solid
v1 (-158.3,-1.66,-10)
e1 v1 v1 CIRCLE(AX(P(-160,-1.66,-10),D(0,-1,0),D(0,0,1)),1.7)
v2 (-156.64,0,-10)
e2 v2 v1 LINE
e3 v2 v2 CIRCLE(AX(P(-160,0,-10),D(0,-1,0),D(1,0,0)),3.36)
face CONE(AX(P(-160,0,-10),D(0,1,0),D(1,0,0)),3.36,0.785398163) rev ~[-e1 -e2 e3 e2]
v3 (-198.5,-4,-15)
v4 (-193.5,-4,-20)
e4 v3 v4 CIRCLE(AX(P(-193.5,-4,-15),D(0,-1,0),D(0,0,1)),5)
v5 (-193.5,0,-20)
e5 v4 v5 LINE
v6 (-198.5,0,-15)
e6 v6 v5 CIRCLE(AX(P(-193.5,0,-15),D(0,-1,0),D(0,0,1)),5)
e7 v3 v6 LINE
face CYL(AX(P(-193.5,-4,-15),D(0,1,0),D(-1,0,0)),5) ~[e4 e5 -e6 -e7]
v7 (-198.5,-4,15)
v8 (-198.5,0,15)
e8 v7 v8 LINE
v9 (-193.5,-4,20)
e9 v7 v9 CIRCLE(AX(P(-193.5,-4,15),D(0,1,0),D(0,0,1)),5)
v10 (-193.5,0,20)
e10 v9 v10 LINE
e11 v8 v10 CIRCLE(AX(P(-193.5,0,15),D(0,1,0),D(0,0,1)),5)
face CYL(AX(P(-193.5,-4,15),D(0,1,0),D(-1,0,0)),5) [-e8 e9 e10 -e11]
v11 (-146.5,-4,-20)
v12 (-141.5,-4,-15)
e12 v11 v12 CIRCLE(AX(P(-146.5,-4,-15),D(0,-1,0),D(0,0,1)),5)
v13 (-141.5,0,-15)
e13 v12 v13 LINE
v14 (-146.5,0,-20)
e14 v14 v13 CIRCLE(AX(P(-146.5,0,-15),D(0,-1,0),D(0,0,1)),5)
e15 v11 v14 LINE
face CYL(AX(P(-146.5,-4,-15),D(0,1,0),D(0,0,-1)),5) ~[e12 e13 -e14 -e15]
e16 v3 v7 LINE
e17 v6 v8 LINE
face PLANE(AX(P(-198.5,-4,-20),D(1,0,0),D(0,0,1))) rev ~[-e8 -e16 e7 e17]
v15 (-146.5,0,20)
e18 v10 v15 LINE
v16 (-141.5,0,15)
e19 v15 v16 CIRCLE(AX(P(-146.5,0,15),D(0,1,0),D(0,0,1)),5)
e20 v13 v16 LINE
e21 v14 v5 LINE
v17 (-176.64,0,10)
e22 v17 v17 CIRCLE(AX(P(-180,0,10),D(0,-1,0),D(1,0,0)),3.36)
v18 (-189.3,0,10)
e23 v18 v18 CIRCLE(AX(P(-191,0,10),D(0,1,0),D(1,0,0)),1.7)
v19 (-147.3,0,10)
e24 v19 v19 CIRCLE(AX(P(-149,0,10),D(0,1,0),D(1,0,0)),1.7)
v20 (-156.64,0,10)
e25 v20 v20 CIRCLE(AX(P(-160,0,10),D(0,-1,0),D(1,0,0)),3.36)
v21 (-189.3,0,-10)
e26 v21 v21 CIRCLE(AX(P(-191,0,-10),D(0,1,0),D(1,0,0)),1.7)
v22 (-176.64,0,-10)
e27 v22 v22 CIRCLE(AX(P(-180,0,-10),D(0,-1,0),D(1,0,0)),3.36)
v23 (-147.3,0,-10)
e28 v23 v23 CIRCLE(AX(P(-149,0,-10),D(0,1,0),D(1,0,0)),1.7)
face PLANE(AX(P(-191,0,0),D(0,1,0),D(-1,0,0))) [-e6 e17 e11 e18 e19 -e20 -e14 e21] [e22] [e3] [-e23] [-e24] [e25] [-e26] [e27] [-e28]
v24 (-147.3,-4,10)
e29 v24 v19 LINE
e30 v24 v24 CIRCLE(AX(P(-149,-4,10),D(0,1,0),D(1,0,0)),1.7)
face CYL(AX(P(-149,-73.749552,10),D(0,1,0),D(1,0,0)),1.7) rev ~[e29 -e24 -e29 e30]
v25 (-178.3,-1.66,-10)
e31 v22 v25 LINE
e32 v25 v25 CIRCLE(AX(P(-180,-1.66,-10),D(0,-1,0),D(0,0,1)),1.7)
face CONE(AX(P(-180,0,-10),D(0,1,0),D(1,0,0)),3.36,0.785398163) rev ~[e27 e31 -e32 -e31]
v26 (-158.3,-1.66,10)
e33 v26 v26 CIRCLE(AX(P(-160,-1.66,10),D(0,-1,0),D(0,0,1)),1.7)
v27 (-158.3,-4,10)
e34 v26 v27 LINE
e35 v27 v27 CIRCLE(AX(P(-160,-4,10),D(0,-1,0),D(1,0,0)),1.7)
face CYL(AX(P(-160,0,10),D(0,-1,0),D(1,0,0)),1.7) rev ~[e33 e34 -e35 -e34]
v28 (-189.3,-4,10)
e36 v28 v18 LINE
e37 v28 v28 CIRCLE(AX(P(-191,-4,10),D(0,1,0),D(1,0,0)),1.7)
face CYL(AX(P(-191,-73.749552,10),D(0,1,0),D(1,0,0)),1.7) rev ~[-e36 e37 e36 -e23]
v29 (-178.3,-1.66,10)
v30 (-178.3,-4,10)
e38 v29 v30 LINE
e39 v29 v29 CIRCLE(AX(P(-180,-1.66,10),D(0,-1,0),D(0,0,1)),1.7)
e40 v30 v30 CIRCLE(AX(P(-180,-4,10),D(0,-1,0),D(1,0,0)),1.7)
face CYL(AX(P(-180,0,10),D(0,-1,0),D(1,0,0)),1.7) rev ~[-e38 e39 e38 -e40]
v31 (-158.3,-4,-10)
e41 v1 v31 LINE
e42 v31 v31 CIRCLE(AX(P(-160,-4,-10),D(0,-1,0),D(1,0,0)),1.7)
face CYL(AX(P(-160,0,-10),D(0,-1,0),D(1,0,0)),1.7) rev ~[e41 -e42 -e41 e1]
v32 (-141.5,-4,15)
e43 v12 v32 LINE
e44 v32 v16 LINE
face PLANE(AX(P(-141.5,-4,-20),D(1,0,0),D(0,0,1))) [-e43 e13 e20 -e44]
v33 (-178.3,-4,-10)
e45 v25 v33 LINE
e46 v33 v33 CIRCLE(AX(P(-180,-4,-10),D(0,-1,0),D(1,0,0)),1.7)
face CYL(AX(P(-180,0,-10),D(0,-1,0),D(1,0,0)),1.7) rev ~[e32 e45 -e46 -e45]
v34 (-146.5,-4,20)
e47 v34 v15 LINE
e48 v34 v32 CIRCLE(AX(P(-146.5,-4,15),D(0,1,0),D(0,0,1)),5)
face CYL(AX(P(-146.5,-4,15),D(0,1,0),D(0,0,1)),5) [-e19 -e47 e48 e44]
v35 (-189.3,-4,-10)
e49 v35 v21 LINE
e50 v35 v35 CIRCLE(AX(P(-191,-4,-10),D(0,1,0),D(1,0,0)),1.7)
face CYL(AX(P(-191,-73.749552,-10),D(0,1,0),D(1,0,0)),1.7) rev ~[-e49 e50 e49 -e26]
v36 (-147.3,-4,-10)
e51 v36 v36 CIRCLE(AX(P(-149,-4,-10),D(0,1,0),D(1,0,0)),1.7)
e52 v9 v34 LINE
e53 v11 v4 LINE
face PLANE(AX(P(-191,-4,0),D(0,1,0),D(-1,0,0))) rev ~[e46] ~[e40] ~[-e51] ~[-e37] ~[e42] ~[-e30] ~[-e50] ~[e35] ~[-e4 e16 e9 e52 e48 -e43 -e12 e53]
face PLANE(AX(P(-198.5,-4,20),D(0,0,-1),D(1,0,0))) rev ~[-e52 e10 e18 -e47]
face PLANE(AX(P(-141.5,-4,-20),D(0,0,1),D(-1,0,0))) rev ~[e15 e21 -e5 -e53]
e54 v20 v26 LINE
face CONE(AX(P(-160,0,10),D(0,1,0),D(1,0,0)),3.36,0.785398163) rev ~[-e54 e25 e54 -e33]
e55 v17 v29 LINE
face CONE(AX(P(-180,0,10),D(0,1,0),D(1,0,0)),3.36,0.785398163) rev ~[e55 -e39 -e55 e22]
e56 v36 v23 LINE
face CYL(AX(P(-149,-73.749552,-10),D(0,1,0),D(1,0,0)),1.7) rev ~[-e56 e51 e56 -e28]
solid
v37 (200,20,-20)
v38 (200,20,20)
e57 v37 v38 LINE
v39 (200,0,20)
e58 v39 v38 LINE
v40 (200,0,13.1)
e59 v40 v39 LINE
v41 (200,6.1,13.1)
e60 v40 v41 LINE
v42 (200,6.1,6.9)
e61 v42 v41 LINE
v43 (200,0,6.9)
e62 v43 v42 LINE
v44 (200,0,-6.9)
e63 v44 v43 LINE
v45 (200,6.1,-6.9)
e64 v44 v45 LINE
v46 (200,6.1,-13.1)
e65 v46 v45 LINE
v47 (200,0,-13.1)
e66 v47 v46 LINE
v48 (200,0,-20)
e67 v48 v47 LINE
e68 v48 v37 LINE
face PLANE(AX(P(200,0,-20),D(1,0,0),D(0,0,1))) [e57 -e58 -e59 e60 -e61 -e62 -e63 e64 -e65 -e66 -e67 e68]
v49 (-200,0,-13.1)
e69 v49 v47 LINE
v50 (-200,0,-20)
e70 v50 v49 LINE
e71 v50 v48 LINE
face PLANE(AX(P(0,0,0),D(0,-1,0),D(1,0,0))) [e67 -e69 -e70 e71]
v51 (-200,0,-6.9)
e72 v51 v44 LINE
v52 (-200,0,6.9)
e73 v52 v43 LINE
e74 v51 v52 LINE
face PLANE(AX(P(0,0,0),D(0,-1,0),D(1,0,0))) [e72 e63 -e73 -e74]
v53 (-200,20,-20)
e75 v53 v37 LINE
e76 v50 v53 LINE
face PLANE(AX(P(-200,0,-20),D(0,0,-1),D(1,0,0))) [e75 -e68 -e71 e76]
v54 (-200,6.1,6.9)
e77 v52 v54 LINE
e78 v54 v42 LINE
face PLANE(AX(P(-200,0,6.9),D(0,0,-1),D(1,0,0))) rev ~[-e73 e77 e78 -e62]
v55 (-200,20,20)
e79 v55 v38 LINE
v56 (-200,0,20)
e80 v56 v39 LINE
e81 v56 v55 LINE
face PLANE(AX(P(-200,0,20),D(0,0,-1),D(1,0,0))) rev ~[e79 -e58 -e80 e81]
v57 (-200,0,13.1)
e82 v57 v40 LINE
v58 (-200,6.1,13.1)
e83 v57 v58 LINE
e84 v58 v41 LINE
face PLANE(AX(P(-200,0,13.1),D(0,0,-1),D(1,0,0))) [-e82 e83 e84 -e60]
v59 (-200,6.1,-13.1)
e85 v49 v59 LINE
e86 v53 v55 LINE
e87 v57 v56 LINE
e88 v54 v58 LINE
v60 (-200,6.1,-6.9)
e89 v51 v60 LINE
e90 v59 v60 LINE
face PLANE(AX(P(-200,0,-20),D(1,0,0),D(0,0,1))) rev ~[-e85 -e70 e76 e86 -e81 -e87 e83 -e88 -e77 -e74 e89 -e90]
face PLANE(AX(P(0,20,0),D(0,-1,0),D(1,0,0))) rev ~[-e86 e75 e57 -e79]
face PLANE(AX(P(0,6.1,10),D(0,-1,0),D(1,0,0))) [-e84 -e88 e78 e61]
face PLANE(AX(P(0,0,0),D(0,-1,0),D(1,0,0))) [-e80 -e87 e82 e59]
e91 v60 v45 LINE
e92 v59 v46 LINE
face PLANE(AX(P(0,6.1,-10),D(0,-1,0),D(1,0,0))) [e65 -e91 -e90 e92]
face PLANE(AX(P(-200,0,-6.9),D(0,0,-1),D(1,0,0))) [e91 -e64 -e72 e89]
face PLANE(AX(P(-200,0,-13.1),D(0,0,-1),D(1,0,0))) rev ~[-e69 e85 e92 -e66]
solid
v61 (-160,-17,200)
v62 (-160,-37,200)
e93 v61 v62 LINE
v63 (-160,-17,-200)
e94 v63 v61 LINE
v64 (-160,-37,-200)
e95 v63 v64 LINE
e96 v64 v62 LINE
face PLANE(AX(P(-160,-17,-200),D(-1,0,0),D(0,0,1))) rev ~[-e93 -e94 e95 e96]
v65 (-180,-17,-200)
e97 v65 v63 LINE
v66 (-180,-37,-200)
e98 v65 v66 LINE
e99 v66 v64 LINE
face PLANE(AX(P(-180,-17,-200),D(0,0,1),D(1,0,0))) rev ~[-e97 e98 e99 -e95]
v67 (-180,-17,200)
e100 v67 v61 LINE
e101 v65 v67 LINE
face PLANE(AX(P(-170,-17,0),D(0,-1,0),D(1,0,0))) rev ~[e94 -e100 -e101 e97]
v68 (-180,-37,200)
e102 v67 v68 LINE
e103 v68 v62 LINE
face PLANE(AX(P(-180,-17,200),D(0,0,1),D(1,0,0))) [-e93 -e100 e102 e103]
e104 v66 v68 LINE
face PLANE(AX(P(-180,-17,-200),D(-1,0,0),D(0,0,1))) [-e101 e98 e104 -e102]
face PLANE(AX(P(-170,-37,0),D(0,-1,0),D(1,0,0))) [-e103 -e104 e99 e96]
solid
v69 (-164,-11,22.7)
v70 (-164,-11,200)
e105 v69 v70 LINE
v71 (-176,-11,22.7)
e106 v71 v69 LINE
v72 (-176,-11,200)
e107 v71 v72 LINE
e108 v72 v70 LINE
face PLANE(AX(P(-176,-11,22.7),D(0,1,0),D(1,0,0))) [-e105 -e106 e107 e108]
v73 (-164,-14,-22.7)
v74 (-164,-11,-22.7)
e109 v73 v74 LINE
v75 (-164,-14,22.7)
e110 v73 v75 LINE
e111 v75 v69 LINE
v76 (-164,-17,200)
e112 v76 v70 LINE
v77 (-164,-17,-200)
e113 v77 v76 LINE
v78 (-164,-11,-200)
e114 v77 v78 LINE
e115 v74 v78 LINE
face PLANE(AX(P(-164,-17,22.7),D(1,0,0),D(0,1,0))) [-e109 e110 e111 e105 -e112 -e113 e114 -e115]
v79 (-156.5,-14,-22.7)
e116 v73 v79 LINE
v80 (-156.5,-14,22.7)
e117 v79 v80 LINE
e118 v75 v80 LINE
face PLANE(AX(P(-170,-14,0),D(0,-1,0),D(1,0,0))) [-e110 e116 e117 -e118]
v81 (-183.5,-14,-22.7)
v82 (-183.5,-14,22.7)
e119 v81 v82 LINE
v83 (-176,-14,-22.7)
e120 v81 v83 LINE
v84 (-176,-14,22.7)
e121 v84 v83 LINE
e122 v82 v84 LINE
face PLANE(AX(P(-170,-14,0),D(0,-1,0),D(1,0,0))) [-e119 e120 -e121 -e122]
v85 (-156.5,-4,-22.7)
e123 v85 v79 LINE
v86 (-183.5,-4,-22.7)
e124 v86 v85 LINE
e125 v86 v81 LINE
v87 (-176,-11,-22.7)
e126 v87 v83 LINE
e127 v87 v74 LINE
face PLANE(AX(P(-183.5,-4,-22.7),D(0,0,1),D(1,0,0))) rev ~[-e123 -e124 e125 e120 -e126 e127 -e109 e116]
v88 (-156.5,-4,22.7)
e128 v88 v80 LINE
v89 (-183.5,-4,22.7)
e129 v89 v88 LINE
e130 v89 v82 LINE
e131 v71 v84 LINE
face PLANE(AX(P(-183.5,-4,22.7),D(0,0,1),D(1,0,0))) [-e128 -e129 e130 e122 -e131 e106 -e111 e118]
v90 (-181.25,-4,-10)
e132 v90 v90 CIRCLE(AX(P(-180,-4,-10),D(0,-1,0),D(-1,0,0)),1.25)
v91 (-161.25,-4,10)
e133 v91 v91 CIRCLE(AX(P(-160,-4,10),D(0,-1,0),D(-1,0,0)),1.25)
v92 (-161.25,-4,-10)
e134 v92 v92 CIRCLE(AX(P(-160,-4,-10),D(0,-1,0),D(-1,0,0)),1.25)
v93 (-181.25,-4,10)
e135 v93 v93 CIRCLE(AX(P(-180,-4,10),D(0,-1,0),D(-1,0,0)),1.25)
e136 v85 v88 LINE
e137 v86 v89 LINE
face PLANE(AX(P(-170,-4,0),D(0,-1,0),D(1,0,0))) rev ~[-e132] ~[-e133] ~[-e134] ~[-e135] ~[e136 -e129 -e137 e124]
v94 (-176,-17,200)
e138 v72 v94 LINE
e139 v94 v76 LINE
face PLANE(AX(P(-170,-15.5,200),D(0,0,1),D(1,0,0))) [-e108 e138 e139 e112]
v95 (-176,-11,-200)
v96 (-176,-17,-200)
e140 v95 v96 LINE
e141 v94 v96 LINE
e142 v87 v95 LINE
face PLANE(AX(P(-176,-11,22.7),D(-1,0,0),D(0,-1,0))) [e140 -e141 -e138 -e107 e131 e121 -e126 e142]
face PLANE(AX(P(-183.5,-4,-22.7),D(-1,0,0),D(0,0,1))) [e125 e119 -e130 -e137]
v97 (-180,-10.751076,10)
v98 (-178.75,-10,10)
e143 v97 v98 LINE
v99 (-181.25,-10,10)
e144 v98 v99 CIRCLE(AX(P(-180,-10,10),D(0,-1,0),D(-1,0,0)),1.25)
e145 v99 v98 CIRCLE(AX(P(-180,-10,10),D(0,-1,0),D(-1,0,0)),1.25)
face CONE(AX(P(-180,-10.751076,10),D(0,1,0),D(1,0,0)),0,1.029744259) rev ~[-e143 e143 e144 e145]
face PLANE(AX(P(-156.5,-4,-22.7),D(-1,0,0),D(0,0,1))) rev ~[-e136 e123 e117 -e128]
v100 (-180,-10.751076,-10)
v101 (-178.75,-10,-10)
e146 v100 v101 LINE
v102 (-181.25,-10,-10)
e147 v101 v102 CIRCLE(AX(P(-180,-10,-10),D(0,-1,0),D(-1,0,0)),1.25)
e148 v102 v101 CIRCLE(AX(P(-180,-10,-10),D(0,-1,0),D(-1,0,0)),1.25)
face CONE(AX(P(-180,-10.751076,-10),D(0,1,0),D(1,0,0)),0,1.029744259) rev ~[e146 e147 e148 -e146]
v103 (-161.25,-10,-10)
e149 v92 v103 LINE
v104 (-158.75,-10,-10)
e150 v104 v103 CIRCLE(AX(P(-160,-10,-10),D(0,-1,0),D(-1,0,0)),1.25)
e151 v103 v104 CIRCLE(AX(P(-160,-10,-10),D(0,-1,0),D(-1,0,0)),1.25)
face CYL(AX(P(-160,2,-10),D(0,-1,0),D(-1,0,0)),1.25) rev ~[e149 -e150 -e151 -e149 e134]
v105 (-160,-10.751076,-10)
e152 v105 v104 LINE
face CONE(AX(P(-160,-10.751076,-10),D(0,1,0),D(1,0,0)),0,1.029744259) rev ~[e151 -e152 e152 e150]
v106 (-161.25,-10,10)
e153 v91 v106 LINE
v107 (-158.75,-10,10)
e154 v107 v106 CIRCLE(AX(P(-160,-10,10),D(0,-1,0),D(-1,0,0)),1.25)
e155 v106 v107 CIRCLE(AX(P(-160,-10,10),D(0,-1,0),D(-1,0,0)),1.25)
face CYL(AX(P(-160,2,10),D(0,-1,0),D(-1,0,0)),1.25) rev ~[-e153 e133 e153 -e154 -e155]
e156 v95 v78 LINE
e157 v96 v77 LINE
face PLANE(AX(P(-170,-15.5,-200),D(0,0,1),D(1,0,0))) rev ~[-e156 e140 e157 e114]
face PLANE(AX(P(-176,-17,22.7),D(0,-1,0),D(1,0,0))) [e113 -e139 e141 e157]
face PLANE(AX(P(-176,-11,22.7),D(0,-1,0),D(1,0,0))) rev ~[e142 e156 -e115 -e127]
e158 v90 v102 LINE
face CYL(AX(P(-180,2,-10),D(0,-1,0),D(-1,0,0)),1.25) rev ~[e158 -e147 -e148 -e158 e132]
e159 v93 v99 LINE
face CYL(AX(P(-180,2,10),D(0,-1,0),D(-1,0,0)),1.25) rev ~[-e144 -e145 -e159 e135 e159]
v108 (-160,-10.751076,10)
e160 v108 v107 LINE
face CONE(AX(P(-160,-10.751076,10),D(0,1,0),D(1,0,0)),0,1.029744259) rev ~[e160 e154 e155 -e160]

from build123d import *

# Parameters (mm, degrees)
F0_W            = 400
F0_H            = 40
F1_DEPTH        = 20
F2_W            = 400
F2_H            = 6.2
F3_DEPTH        = 6.1
F5_W            = 27
F5_H            = 45.4
F6_DEPTH        = 10
F7_D            = 2.5
F7_DEPTH        = 6
F7_TIP          = 0.7510757738
F8_W            = 15
F8_H            = 40
F8_W_2          = 27
F8_R            = 1.25
F9_DEPTH        = 4
F11_D           = 3.4
F11_CSINK_D     = 6.72
F11_CSINK_ANGLE = 90
F12_D           = 3.4
F13_R           = 5
F14_W           = 12
F14_H           = 3
F15_DEPTH       = 177.3
F15_DEPTH_BACK  = 222.7
F16_W           = 20
F16_H           = 400
F17_DEPTH       = 20


with BuildPart() as f1:
    # F0 (on Front) → F1 (new body)
    with BuildSketch(Plane.XZ):
        Rectangle(F0_W, F0_H)
    extrude(amount=-F1_DEPTH)

    # F2 (on face) → F3 (cut)
    with BuildSketch(Plane.XZ):
        with Locations((0, 10)):
            Rectangle(F2_W, F2_H)
        with Locations((0, -10)):
            Rectangle(F2_W, F2_H)
    extrude(amount=-F3_DEPTH, mode=Mode.SUBTRACT)


with BuildPart() as f6:
    # F5 (on offset) → F6 (new body)
    with BuildSketch(Plane.XZ.offset(4)):
        with Locations((-170, 0)):
            Rectangle(F5_W, F5_H)
    extrude(amount=F6_DEPTH)

    # F7
    with Locations(Plane(origin=(0, -4, 0), x_dir=(1, 0, 0), z_dir=(0, 1, 0))):
        with Locations((-160, -10), (-180, -10), (-160, 10), (-180, 10)):
            Hole(F7_D / 2, depth=F7_DEPTH)
            with Locations((0, 0, -(F7_DEPTH + F7_TIP / 2))):  # 118° drill point
                Cone(0, F7_D / 2, F7_TIP, mode=Mode.SUBTRACT)

    # F14 (on face) → F15 (join, two sides)
    with BuildSketch(Plane.XY.offset(22.7)) as f15_sk:
        with Locations((-170, -15.5)):
            Rectangle(F14_W, F14_H)
        with Locations((-170, -12.5)):
            Rectangle(F14_W, F14_H)
    extrude(amount=F15_DEPTH)
    extrude(f15_sk.sketch, amount=-F15_DEPTH_BACK)


with BuildPart() as f9:
    # F8 (on face) → F9 (new body)
    with BuildSketch(Plane(origin=(0, -4, 0), x_dir=(-1, 0, 0), z_dir=(0, 1, 0))):
        with Locations((191, 0)):
            Rectangle(F8_W, F8_H)
        with Locations((170, 0)):
            Rectangle(F8_W_2, F8_H)
        with Locations((160, -10)):
            Circle(F8_R, mode=Mode.SUBTRACT)
        with Locations((180, -10)):
            Circle(F8_R, mode=Mode.SUBTRACT)
        with Locations((160, 10)):
            Circle(F8_R, mode=Mode.SUBTRACT)
        with Locations((180, 10)):
            Circle(F8_R, mode=Mode.SUBTRACT)
        with Locations((149, 0)):
            Rectangle(F8_W, F8_H)
    extrude(amount=F9_DEPTH)

    # F11 (through all)
    with Locations(Plane(origin=(0, 0, 0), x_dir=(-1, 0, 0), z_dir=(0, 1, 0))):
        with Locations((160, 10), (180, 10), (160, -10), (180, -10)):
            CounterSinkHole(F11_D / 2, F11_CSINK_D / 2, counter_sink_angle=F11_CSINK_ANGLE)

    # F12 (through all)
    with Locations(Plane(origin=(0, -4, 0), x_dir=(-1, 0, 0), z_dir=(0, -1, 0))):
        with Locations((191, -10), (191, 10), (149, -10), (149, 10)):
            Hole(F12_D / 2)

    # F13
    f13_edges = [f9.edges().sort_by_distance(p)[0] for p in [
        (-198.5, -2, 20),
        (-141.5, -2, 20),
        (-198.5, -2, -20),
        (-141.5, -2, -20),
    ]]
    fillet(f13_edges, radius=F13_R)


with BuildPart() as f17:
    # F16 (on face) → F17 (new body)
    with BuildSketch(Plane.XZ.offset(17)):
        with Locations((-170, 0)):
            Rectangle(F16_W, F16_H)
    extrude(amount=F17_DEPTH)


solid = Compound([f1.part, f6.part, f9.part, f17.part])
